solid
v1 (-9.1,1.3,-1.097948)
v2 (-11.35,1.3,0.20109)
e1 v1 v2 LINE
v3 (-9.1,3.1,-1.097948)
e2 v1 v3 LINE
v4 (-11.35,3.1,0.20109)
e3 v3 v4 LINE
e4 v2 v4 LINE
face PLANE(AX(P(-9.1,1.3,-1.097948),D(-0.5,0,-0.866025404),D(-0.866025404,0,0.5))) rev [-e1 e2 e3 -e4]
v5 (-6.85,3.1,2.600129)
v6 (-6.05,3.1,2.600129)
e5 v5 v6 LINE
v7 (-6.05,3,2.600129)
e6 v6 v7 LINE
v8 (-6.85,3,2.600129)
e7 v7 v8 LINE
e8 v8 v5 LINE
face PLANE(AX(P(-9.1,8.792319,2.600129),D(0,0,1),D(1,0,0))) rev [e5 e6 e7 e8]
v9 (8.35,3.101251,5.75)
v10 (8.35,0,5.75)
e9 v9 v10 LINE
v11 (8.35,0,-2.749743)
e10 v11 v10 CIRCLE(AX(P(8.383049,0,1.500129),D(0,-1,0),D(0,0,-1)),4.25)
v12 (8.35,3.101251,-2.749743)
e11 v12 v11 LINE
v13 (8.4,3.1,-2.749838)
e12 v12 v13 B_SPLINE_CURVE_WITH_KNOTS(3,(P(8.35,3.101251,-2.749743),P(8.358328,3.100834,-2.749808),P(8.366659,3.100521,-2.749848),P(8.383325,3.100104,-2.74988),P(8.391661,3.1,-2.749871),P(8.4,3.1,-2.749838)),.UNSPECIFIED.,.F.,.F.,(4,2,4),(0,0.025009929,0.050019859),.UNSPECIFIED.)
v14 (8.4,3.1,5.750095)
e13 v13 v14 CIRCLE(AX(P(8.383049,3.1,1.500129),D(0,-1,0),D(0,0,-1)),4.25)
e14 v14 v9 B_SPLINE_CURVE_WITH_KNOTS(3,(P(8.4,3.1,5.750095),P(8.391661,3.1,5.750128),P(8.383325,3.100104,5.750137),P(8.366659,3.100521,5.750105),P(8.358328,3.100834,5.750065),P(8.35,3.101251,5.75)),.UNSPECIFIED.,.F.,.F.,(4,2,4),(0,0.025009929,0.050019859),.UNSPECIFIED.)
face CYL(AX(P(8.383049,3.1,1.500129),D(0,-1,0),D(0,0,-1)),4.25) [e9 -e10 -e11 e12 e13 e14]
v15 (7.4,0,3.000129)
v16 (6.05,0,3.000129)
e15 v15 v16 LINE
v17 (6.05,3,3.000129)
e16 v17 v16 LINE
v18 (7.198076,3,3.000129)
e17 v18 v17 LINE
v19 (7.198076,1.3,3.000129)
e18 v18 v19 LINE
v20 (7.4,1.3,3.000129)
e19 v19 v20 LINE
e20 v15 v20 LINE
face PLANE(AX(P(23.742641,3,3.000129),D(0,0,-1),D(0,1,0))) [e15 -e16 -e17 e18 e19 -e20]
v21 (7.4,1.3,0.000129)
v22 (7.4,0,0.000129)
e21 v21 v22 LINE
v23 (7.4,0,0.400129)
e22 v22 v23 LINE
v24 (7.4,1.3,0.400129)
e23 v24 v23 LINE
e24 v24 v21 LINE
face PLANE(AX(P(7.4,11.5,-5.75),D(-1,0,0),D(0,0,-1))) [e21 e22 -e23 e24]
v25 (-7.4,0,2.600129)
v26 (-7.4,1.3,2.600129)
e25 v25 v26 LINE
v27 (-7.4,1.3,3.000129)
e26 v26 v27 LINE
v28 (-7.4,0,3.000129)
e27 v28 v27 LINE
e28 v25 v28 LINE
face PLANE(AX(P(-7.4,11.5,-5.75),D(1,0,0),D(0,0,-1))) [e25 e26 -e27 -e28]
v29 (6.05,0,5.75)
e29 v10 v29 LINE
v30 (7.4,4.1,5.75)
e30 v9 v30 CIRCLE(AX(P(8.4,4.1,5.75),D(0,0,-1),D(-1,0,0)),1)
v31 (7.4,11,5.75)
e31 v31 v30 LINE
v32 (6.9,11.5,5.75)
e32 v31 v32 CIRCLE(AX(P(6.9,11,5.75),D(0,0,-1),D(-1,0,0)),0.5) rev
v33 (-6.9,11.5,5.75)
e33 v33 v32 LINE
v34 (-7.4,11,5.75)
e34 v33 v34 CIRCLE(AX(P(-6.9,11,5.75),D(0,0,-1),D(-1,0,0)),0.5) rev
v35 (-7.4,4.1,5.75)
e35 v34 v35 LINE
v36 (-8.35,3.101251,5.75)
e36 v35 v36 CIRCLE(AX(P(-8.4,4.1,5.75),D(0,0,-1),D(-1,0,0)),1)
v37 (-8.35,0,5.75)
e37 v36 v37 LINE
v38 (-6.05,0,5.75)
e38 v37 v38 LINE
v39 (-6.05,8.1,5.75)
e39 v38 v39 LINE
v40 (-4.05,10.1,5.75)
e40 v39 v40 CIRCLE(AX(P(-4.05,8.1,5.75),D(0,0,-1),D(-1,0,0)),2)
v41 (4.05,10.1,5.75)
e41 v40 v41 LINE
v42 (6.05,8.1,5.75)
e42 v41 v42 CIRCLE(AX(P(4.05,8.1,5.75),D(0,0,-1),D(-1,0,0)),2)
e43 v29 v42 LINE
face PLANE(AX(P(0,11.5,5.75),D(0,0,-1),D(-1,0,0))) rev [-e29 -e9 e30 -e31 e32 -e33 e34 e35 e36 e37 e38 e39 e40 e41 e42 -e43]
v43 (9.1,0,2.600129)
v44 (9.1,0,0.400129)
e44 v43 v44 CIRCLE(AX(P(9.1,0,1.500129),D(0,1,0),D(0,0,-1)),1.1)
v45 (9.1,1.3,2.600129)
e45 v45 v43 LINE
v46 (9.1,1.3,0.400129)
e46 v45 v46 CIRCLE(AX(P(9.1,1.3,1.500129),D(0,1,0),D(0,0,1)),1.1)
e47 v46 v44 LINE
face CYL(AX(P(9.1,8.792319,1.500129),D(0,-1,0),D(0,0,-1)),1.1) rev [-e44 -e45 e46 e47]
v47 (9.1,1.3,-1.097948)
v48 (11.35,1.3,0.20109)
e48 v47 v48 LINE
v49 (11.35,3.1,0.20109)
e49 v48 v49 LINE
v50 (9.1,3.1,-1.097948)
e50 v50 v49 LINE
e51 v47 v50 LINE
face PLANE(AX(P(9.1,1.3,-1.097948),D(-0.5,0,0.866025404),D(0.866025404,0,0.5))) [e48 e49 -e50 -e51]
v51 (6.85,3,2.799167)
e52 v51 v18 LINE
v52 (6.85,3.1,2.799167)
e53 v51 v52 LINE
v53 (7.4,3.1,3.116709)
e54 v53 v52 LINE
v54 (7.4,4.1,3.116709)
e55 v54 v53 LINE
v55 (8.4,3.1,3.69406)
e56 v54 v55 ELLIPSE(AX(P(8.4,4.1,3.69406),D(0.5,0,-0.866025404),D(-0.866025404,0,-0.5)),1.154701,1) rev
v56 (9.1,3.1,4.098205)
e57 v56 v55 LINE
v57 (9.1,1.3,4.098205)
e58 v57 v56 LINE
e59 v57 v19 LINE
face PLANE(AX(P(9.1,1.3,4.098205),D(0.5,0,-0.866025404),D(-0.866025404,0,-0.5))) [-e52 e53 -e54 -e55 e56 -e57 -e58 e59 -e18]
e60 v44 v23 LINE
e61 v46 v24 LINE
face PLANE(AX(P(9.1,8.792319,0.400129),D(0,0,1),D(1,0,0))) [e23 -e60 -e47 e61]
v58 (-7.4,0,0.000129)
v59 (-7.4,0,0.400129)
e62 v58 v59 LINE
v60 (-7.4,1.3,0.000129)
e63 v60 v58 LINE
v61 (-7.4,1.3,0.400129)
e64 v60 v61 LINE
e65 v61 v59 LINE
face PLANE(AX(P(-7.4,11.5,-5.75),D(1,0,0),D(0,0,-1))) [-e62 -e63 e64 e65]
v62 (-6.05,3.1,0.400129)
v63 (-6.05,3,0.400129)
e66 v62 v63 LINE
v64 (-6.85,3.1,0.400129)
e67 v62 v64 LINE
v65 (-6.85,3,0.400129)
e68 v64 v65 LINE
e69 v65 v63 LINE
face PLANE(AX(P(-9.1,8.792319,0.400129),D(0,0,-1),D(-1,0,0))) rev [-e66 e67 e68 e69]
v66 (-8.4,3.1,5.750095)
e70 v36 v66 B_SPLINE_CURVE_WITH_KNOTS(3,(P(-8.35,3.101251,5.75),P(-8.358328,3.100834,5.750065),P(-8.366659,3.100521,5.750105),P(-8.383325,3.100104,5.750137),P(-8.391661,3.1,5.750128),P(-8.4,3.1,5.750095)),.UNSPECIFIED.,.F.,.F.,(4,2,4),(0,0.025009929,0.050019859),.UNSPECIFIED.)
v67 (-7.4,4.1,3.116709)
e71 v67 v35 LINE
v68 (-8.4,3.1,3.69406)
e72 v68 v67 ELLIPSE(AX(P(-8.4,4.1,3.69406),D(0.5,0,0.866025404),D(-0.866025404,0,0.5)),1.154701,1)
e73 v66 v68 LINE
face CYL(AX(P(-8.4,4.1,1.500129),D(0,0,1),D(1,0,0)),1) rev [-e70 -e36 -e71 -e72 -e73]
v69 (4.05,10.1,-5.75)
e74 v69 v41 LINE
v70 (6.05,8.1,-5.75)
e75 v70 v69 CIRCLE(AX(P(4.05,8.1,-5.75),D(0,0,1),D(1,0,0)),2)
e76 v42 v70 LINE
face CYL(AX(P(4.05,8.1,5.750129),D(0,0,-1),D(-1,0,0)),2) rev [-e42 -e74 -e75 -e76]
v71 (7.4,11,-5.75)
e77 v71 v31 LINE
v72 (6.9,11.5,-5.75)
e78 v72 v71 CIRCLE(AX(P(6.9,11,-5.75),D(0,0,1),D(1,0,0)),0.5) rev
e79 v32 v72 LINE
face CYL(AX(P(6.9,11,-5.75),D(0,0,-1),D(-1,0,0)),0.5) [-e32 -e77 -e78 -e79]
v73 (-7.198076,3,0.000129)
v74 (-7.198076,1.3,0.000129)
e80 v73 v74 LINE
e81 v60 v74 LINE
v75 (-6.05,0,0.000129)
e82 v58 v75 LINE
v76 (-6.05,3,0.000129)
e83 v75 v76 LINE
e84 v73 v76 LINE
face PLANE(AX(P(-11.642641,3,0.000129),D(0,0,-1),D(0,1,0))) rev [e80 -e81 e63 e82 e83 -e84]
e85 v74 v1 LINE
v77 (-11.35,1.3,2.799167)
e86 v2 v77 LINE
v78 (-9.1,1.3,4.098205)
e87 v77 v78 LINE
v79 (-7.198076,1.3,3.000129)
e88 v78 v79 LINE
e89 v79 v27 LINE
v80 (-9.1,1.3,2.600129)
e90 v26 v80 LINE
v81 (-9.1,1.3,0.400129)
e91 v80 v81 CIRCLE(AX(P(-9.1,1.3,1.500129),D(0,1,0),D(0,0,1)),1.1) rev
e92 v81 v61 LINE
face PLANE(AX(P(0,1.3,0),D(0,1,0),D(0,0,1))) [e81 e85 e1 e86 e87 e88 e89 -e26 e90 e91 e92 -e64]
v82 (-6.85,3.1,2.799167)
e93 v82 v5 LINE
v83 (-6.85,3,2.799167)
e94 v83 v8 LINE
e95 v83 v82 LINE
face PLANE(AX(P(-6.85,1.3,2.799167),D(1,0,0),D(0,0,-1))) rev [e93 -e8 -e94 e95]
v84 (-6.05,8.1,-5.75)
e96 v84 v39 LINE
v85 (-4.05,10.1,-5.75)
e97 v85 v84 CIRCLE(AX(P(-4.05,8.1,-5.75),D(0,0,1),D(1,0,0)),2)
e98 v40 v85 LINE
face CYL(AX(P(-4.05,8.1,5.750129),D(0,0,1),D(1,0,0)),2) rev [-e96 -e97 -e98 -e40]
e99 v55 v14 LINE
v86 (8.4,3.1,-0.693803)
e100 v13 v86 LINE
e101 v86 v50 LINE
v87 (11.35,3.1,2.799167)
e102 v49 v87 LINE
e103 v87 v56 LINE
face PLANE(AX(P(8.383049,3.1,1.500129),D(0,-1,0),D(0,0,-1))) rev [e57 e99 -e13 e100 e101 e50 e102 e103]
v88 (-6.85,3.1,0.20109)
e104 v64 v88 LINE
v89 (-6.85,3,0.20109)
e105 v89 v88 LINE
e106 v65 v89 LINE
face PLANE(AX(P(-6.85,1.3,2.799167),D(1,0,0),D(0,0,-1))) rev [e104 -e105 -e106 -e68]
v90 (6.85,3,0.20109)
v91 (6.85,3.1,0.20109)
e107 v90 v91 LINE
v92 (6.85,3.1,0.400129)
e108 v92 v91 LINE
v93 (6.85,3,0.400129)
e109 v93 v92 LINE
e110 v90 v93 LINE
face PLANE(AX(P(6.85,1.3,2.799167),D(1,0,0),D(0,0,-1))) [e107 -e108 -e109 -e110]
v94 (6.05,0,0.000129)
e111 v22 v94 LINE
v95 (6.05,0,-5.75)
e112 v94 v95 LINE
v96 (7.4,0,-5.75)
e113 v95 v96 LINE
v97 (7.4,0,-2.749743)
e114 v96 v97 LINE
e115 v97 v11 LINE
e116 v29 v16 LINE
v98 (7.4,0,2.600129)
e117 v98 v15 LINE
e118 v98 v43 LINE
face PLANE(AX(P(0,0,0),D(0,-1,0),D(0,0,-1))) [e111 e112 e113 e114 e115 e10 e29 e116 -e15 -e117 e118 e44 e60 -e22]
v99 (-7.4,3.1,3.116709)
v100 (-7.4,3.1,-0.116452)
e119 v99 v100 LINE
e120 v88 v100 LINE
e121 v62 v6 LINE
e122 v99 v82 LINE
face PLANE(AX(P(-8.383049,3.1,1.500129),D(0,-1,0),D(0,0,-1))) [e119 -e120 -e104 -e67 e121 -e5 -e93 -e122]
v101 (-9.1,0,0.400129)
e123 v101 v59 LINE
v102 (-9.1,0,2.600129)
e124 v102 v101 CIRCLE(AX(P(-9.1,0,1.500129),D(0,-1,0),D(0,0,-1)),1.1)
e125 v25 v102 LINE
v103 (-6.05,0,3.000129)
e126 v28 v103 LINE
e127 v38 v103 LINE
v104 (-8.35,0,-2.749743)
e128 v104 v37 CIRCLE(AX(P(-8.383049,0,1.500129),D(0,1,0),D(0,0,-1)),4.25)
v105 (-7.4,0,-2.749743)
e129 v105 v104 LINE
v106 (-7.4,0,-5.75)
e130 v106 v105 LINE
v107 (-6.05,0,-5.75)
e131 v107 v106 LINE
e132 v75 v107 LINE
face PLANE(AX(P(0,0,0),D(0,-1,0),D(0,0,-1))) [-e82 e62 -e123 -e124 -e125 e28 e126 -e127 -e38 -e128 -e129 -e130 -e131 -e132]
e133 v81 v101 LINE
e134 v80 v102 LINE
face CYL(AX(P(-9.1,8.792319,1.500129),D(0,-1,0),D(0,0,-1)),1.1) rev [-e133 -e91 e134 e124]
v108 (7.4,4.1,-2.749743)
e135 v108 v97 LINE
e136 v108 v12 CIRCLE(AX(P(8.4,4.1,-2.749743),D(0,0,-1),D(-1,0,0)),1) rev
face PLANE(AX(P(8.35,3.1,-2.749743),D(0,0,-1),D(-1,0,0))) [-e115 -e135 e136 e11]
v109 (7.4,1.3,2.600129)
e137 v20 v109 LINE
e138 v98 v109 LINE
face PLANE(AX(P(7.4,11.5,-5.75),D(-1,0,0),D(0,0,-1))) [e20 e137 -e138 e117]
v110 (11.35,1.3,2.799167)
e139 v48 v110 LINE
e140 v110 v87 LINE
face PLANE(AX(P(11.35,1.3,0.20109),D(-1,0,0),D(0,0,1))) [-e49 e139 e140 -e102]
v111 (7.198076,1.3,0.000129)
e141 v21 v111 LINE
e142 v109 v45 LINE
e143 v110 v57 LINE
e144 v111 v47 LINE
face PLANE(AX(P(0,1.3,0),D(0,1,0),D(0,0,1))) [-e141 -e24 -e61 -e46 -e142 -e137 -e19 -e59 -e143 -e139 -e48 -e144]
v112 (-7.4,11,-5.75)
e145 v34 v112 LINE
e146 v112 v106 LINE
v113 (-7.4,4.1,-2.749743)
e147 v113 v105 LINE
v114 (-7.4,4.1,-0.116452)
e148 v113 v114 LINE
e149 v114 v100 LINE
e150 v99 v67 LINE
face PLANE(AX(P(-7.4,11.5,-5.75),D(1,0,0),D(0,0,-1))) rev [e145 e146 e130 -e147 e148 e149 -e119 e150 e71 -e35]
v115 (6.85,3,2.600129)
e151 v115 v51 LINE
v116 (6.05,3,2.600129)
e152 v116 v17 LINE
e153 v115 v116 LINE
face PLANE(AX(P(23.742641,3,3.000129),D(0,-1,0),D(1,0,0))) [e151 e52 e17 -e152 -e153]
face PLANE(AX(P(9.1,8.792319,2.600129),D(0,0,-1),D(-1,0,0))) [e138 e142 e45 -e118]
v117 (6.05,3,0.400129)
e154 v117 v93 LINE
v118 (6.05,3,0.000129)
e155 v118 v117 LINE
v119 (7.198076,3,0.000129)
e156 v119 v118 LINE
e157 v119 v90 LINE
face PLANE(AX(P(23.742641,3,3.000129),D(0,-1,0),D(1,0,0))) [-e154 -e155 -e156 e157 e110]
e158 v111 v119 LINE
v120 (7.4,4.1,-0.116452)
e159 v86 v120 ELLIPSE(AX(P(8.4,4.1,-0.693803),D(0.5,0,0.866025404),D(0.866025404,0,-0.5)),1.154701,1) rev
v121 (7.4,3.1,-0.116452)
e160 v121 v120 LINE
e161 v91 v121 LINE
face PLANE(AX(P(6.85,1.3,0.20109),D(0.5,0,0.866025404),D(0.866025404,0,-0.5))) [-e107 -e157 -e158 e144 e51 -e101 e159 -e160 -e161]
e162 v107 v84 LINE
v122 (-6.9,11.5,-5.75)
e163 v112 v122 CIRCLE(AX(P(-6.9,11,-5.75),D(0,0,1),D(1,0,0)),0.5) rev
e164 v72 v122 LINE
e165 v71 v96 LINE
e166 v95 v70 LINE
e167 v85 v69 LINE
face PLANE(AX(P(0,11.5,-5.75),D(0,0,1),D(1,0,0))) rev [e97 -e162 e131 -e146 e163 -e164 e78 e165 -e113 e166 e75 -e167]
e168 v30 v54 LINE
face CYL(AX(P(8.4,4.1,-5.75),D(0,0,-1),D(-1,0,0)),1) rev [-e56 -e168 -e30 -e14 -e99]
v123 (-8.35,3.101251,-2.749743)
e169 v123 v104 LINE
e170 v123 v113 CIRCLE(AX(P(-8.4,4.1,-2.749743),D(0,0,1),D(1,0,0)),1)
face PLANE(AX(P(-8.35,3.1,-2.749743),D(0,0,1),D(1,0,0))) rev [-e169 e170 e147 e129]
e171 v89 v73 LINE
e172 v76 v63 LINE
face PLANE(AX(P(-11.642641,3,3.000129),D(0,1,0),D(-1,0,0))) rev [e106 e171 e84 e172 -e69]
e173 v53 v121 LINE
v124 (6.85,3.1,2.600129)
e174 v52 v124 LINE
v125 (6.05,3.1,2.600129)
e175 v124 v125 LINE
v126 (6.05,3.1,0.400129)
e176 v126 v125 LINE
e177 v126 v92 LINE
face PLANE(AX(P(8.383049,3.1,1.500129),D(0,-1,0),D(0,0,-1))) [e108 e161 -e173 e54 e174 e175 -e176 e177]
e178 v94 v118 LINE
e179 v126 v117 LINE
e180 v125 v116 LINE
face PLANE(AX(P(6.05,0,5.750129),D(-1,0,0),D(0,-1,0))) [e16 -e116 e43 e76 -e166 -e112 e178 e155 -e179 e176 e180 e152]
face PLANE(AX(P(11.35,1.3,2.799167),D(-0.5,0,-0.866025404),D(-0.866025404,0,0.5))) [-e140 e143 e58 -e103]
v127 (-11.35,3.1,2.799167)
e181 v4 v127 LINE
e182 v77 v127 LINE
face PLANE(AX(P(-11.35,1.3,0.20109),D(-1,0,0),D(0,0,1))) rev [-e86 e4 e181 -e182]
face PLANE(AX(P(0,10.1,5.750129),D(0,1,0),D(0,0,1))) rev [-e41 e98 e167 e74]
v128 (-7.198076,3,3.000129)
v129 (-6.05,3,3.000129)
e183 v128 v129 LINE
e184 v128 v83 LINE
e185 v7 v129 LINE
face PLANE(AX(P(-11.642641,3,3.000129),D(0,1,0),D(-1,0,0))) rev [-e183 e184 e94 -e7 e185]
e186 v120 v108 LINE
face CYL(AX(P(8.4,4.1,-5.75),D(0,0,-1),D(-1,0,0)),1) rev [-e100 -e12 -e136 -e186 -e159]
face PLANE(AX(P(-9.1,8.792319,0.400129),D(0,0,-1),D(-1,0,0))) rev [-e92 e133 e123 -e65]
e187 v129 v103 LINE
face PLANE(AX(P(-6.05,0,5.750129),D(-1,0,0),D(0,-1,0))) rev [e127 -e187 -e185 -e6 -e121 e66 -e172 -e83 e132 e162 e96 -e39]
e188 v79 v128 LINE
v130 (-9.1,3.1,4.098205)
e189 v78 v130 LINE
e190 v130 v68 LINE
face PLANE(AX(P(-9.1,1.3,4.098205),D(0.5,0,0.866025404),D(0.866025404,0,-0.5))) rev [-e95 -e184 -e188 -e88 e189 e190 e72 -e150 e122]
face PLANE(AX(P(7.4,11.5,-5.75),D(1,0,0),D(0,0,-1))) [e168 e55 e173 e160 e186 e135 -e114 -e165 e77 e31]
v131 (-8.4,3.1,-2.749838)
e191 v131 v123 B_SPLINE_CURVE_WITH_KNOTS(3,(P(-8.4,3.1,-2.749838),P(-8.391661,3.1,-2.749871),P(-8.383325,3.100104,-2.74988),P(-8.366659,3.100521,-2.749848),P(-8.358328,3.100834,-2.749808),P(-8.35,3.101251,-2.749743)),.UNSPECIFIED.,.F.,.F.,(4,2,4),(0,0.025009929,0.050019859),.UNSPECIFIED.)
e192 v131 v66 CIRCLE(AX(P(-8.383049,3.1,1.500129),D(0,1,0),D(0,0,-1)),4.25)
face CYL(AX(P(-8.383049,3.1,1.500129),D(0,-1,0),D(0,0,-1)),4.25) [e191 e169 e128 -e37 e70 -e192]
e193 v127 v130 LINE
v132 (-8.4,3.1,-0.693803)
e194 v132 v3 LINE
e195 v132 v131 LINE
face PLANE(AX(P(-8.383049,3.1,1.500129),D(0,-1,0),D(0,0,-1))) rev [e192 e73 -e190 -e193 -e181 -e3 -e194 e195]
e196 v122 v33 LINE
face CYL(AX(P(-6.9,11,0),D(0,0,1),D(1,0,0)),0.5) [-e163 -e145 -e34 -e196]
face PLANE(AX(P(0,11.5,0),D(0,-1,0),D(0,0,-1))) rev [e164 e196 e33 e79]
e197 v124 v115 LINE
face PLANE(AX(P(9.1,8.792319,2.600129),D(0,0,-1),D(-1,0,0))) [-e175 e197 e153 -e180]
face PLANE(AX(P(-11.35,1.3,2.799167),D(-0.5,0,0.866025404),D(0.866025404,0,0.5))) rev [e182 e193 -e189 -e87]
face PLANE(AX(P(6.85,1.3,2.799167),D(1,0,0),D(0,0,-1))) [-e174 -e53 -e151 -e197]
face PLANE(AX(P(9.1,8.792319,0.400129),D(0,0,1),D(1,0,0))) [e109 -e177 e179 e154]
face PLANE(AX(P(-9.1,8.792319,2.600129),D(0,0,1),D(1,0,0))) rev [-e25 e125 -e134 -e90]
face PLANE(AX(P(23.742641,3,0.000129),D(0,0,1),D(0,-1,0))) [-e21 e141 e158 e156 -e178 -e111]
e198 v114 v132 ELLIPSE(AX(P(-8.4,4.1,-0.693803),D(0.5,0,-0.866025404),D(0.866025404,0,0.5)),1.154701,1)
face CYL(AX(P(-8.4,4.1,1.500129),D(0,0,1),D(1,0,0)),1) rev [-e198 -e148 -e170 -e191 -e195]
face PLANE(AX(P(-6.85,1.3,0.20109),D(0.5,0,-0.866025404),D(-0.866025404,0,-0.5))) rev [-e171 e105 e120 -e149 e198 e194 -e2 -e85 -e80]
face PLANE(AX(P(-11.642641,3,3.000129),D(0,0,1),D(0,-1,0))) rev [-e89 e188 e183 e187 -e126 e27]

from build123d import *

# Parameters (mm, degrees)
SKETCH1_W           = 7.4
SKETCH1_H           = 11.5
BOSS_EXTRUDE1_DEPTH = 11.5
BOSS_EXTRUDE2_DEPTH = 3.1
SKETCH6_W           = 6.05
SKETCH6_H           = 10.1
CUT_EXTRUDE1_DEPTH  = 21.593612692
CUT_EXTRUDE2_DEPTH  = 3.1
SKETCH8_W           = 3
SKETCH8_H           = 3
CUT_EXTRUDE3_DEPTH  = 1.35
CUT_EXTRUDE4_DEPTH  = 1.8
FILLET1_R           = 1
FILLET2_R           = 0.5
FILLET3_R           = 2


# Read off the part's stored shape, not the designer's step: Mirror3
with BuildPart() as part:
    # Sketch1 → Boss-Extrude1 (new body)
    with BuildSketch(Plane(origin=(0, 0, 0), x_dir=(1, 0, 0), z_dir=(0, 1, 0))):
        with Locations((-3.7, 0)):
            Rectangle(SKETCH1_W, SKETCH1_H)
    extrude(amount=BOSS_EXTRUDE1_DEPTH)

    # Sketch3 → Boss-Extrude2 (add)
    with BuildSketch(Plane(origin=(0, 0, 0), x_dir=(1, 0, 0), z_dir=(0, 1, 0))):
        with BuildLine():
            Line((-8.35, 2.749742999), (-7.4, 2.749742999))
            Line((-7.4, 2.749742999), (-7.4, -5.75))
            Line((-7.4, -5.75), (-8.35, -5.75))
            ThreePointArc((-8.35, -5.75), (-12.633049046, -1.500128501), (-8.35, 2.749742999))
        make_face()
    extrude(amount=BOSS_EXTRUDE2_DEPTH)

    # Sketch6 → Cut-Extrude1 (cut, through all)
    with BuildSketch(Plane(origin=(0, 0, -5.75), x_dir=(-1, 0, 0), z_dir=(0, 0, -1))):
        with Locations((3.025, 5.05)):
            Rectangle(SKETCH6_W, SKETCH6_H)
    extrude(amount=-CUT_EXTRUDE1_DEPTH, mode=Mode.SUBTRACT)

    # Sketch7 → Cut-Extrude2 (cut)
    with BuildSketch(Plane.XZ):
        with BuildLine():
            Line((-9.1, 2.600128501), (-6.05, 2.600128501))
            ThreePointArc((-6.05, 2.600128501), (-4.95, 1.500128501), (-6.05, 0.400128501))
            Line((-6.05, 0.400128501), (-9.1, 0.400128501))
            ThreePointArc((-9.1, 0.400128501), (-10.2, 1.500128501), (-9.1, 2.600128501))
        make_face()
    extrude(amount=-CUT_EXTRUDE2_DEPTH, mode=Mode.SUBTRACT)

    # Sketch8 → Cut-Extrude3 (cut)
    with BuildSketch(Plane(origin=(-6.05, 0, 0), x_dir=(0, 0, -1), z_dir=(1, 0, 0))):
        with Locations((-1.500128501, 1.5)):
            Rectangle(SKETCH8_W, SKETCH8_H)
    extrude(amount=-CUT_EXTRUDE3_DEPTH, mode=Mode.SUBTRACT)

    # Sketch9 → Cut-Extrude4 (cut)
    with BuildSketch(Plane(origin=(0, 3.1, 0), x_dir=(1, 0, 0), z_dir=(0, 1, 0))):
        Polygon((-6.85, -2.799166606), (-6.85, -0.201090395), (-9.1, 1.097947711), (-11.35, -0.201090395), (-11.35, -2.799166606), (-9.1, -4.098204712), align=None)
    extrude(amount=-CUT_EXTRUDE4_DEPTH, mode=Mode.SUBTRACT)

    # Fillet1
    # the kernel refuses this fillet: 1 mm, written as the material it adds along each edge
    with BuildSketch(Plane(origin=(-7.4, 3.1, -2.749742999), x_dir=(-1, 0, 0), z_dir=(0, 0, 1))) as fillet1_piece_1_section:
        with BuildLine():
            CenterArc((FILLET1_R, -FILLET1_R), FILLET1_R, 90, 90)
            Line((0, -FILLET1_R), (0, 0))
            Line((0, 0), (FILLET1_R, 0))
        make_face()
    fillet1_piece_1 = extrude(amount=5.133290746, mode=Mode.PRIVATE)
    fillet1_piece_1 = split(fillet1_piece_1, bisect_by=Plane(origin=(-8.63172693, 3.371201356, -0.827590128), z_dir=(0.49999999999999983, 0, -0.8660254037844388)), keep=Keep.TOP, mode=Mode.PRIVATE)
    add(fillet1_piece_1)
    with BuildSketch(Plane(origin=(-7.4, 3.1, -5.249742999), x_dir=(-1, 0, 0), z_dir=(0, 0, 1))) as fillet1_piece_2_section:
        with BuildLine():
            CenterArc((FILLET1_R, -FILLET1_R), FILLET1_R, 90, 90)
            Line((0, -FILLET1_R), (0, 0))
            Line((0, 0), (FILLET1_R, 0))
        make_face()
    fillet1_piece_2 = extrude(amount=7.633290746, mode=Mode.PRIVATE)
    fillet1_piece_2 = fillet1_piece_2 & Plane(origin=(-8.383049046, 3.100281112, 1.500128501), x_dir=(0.007776246012108559, 0, 0.9999697645418881), z_dir=(0, -1, 0)) * Cylinder(4.25, 20, mode=Mode.PRIVATE)
    fillet1_piece_2 = split(fillet1_piece_2, bisect_by=Plane(origin=(-9.26614006, 3.100281112, -1.193868719), z_dir=(0.49999999999999983, 0, -0.8660254037844388)), keep=Keep.TOP, mode=Mode.PRIVATE)
    add(fillet1_piece_2)
    with BuildSketch(Plane(origin=(-7.4, 3.1, 0.616709254), x_dir=(-1, 0, 0), z_dir=(0, 0, 1))) as fillet1_piece_3_section:
        with BuildLine():
            CenterArc((FILLET1_R, -FILLET1_R), FILLET1_R, 90, 90)
            Line((0, -FILLET1_R), (0, 0))
            Line((0, 0), (FILLET1_R, 0))
        make_face()
    fillet1_piece_3 = extrude(amount=5.133290746, mode=Mode.PRIVATE)
    fillet1_piece_3 = split(fillet1_piece_3, bisect_by=Plane(origin=(-8.144343012, 3.326849972, 3.546455893), z_dir=(0.5000000000000008, 0, 0.8660254037844383)), keep=Keep.TOP, mode=Mode.PRIVATE)
    add(fillet1_piece_3)
    with BuildSketch(Plane(origin=(-7.4, 3.1, 0.616709254), x_dir=(-1, 0, 0), z_dir=(0, 0, 1))) as fillet1_piece_4_section:
        with BuildLine():
            CenterArc((FILLET1_R, -FILLET1_R), FILLET1_R, 90, 90)
            Line((0, -FILLET1_R), (0, 0))
            Line((0, 0), (FILLET1_R, 0))
        make_face()
    fillet1_piece_4 = extrude(amount=7.633290746, mode=Mode.PRIVATE)
    fillet1_piece_4 = fillet1_piece_4 & Plane(origin=(-8.383049046, 3.100281111, 1.500128501), x_dir=(0.007776246012108559, 0, 0.9999697645418881), z_dir=(0, -1, 0)) * Cylinder(4.25, 20, mode=Mode.PRIVATE)
    fillet1_piece_4 = split(fillet1_piece_4, bisect_by=Plane(origin=(-9.266139995, 3.100281111, 4.194125683), z_dir=(0.5000000000000008, 0, 0.8660254037844383)), keep=Keep.TOP, mode=Mode.PRIVATE)
    add(fillet1_piece_4)

    # Fillet2
    fillet2_edges = [part.edges().sort_by_distance(p)[0] for p in [
        (-7.4, 11.5, 0),
    ]]
    fillet(fillet2_edges, radius=FILLET2_R)

    # Fillet3
    fillet3_edges = [part.edges().sort_by_distance(p)[0] for p in [
        (-6.05, 10.1, 0),
    ]]
    fillet(fillet3_edges, radius=FILLET3_R)

    # Mirror3: part across plane


with BuildPart() as part_1:
    add(part.part)
    add(part.part.mirror(Plane(origin=(0, 0, 0), x_dir=(0, 0, 1), z_dir=(1, 0, 0))))


solid = part_1.part
